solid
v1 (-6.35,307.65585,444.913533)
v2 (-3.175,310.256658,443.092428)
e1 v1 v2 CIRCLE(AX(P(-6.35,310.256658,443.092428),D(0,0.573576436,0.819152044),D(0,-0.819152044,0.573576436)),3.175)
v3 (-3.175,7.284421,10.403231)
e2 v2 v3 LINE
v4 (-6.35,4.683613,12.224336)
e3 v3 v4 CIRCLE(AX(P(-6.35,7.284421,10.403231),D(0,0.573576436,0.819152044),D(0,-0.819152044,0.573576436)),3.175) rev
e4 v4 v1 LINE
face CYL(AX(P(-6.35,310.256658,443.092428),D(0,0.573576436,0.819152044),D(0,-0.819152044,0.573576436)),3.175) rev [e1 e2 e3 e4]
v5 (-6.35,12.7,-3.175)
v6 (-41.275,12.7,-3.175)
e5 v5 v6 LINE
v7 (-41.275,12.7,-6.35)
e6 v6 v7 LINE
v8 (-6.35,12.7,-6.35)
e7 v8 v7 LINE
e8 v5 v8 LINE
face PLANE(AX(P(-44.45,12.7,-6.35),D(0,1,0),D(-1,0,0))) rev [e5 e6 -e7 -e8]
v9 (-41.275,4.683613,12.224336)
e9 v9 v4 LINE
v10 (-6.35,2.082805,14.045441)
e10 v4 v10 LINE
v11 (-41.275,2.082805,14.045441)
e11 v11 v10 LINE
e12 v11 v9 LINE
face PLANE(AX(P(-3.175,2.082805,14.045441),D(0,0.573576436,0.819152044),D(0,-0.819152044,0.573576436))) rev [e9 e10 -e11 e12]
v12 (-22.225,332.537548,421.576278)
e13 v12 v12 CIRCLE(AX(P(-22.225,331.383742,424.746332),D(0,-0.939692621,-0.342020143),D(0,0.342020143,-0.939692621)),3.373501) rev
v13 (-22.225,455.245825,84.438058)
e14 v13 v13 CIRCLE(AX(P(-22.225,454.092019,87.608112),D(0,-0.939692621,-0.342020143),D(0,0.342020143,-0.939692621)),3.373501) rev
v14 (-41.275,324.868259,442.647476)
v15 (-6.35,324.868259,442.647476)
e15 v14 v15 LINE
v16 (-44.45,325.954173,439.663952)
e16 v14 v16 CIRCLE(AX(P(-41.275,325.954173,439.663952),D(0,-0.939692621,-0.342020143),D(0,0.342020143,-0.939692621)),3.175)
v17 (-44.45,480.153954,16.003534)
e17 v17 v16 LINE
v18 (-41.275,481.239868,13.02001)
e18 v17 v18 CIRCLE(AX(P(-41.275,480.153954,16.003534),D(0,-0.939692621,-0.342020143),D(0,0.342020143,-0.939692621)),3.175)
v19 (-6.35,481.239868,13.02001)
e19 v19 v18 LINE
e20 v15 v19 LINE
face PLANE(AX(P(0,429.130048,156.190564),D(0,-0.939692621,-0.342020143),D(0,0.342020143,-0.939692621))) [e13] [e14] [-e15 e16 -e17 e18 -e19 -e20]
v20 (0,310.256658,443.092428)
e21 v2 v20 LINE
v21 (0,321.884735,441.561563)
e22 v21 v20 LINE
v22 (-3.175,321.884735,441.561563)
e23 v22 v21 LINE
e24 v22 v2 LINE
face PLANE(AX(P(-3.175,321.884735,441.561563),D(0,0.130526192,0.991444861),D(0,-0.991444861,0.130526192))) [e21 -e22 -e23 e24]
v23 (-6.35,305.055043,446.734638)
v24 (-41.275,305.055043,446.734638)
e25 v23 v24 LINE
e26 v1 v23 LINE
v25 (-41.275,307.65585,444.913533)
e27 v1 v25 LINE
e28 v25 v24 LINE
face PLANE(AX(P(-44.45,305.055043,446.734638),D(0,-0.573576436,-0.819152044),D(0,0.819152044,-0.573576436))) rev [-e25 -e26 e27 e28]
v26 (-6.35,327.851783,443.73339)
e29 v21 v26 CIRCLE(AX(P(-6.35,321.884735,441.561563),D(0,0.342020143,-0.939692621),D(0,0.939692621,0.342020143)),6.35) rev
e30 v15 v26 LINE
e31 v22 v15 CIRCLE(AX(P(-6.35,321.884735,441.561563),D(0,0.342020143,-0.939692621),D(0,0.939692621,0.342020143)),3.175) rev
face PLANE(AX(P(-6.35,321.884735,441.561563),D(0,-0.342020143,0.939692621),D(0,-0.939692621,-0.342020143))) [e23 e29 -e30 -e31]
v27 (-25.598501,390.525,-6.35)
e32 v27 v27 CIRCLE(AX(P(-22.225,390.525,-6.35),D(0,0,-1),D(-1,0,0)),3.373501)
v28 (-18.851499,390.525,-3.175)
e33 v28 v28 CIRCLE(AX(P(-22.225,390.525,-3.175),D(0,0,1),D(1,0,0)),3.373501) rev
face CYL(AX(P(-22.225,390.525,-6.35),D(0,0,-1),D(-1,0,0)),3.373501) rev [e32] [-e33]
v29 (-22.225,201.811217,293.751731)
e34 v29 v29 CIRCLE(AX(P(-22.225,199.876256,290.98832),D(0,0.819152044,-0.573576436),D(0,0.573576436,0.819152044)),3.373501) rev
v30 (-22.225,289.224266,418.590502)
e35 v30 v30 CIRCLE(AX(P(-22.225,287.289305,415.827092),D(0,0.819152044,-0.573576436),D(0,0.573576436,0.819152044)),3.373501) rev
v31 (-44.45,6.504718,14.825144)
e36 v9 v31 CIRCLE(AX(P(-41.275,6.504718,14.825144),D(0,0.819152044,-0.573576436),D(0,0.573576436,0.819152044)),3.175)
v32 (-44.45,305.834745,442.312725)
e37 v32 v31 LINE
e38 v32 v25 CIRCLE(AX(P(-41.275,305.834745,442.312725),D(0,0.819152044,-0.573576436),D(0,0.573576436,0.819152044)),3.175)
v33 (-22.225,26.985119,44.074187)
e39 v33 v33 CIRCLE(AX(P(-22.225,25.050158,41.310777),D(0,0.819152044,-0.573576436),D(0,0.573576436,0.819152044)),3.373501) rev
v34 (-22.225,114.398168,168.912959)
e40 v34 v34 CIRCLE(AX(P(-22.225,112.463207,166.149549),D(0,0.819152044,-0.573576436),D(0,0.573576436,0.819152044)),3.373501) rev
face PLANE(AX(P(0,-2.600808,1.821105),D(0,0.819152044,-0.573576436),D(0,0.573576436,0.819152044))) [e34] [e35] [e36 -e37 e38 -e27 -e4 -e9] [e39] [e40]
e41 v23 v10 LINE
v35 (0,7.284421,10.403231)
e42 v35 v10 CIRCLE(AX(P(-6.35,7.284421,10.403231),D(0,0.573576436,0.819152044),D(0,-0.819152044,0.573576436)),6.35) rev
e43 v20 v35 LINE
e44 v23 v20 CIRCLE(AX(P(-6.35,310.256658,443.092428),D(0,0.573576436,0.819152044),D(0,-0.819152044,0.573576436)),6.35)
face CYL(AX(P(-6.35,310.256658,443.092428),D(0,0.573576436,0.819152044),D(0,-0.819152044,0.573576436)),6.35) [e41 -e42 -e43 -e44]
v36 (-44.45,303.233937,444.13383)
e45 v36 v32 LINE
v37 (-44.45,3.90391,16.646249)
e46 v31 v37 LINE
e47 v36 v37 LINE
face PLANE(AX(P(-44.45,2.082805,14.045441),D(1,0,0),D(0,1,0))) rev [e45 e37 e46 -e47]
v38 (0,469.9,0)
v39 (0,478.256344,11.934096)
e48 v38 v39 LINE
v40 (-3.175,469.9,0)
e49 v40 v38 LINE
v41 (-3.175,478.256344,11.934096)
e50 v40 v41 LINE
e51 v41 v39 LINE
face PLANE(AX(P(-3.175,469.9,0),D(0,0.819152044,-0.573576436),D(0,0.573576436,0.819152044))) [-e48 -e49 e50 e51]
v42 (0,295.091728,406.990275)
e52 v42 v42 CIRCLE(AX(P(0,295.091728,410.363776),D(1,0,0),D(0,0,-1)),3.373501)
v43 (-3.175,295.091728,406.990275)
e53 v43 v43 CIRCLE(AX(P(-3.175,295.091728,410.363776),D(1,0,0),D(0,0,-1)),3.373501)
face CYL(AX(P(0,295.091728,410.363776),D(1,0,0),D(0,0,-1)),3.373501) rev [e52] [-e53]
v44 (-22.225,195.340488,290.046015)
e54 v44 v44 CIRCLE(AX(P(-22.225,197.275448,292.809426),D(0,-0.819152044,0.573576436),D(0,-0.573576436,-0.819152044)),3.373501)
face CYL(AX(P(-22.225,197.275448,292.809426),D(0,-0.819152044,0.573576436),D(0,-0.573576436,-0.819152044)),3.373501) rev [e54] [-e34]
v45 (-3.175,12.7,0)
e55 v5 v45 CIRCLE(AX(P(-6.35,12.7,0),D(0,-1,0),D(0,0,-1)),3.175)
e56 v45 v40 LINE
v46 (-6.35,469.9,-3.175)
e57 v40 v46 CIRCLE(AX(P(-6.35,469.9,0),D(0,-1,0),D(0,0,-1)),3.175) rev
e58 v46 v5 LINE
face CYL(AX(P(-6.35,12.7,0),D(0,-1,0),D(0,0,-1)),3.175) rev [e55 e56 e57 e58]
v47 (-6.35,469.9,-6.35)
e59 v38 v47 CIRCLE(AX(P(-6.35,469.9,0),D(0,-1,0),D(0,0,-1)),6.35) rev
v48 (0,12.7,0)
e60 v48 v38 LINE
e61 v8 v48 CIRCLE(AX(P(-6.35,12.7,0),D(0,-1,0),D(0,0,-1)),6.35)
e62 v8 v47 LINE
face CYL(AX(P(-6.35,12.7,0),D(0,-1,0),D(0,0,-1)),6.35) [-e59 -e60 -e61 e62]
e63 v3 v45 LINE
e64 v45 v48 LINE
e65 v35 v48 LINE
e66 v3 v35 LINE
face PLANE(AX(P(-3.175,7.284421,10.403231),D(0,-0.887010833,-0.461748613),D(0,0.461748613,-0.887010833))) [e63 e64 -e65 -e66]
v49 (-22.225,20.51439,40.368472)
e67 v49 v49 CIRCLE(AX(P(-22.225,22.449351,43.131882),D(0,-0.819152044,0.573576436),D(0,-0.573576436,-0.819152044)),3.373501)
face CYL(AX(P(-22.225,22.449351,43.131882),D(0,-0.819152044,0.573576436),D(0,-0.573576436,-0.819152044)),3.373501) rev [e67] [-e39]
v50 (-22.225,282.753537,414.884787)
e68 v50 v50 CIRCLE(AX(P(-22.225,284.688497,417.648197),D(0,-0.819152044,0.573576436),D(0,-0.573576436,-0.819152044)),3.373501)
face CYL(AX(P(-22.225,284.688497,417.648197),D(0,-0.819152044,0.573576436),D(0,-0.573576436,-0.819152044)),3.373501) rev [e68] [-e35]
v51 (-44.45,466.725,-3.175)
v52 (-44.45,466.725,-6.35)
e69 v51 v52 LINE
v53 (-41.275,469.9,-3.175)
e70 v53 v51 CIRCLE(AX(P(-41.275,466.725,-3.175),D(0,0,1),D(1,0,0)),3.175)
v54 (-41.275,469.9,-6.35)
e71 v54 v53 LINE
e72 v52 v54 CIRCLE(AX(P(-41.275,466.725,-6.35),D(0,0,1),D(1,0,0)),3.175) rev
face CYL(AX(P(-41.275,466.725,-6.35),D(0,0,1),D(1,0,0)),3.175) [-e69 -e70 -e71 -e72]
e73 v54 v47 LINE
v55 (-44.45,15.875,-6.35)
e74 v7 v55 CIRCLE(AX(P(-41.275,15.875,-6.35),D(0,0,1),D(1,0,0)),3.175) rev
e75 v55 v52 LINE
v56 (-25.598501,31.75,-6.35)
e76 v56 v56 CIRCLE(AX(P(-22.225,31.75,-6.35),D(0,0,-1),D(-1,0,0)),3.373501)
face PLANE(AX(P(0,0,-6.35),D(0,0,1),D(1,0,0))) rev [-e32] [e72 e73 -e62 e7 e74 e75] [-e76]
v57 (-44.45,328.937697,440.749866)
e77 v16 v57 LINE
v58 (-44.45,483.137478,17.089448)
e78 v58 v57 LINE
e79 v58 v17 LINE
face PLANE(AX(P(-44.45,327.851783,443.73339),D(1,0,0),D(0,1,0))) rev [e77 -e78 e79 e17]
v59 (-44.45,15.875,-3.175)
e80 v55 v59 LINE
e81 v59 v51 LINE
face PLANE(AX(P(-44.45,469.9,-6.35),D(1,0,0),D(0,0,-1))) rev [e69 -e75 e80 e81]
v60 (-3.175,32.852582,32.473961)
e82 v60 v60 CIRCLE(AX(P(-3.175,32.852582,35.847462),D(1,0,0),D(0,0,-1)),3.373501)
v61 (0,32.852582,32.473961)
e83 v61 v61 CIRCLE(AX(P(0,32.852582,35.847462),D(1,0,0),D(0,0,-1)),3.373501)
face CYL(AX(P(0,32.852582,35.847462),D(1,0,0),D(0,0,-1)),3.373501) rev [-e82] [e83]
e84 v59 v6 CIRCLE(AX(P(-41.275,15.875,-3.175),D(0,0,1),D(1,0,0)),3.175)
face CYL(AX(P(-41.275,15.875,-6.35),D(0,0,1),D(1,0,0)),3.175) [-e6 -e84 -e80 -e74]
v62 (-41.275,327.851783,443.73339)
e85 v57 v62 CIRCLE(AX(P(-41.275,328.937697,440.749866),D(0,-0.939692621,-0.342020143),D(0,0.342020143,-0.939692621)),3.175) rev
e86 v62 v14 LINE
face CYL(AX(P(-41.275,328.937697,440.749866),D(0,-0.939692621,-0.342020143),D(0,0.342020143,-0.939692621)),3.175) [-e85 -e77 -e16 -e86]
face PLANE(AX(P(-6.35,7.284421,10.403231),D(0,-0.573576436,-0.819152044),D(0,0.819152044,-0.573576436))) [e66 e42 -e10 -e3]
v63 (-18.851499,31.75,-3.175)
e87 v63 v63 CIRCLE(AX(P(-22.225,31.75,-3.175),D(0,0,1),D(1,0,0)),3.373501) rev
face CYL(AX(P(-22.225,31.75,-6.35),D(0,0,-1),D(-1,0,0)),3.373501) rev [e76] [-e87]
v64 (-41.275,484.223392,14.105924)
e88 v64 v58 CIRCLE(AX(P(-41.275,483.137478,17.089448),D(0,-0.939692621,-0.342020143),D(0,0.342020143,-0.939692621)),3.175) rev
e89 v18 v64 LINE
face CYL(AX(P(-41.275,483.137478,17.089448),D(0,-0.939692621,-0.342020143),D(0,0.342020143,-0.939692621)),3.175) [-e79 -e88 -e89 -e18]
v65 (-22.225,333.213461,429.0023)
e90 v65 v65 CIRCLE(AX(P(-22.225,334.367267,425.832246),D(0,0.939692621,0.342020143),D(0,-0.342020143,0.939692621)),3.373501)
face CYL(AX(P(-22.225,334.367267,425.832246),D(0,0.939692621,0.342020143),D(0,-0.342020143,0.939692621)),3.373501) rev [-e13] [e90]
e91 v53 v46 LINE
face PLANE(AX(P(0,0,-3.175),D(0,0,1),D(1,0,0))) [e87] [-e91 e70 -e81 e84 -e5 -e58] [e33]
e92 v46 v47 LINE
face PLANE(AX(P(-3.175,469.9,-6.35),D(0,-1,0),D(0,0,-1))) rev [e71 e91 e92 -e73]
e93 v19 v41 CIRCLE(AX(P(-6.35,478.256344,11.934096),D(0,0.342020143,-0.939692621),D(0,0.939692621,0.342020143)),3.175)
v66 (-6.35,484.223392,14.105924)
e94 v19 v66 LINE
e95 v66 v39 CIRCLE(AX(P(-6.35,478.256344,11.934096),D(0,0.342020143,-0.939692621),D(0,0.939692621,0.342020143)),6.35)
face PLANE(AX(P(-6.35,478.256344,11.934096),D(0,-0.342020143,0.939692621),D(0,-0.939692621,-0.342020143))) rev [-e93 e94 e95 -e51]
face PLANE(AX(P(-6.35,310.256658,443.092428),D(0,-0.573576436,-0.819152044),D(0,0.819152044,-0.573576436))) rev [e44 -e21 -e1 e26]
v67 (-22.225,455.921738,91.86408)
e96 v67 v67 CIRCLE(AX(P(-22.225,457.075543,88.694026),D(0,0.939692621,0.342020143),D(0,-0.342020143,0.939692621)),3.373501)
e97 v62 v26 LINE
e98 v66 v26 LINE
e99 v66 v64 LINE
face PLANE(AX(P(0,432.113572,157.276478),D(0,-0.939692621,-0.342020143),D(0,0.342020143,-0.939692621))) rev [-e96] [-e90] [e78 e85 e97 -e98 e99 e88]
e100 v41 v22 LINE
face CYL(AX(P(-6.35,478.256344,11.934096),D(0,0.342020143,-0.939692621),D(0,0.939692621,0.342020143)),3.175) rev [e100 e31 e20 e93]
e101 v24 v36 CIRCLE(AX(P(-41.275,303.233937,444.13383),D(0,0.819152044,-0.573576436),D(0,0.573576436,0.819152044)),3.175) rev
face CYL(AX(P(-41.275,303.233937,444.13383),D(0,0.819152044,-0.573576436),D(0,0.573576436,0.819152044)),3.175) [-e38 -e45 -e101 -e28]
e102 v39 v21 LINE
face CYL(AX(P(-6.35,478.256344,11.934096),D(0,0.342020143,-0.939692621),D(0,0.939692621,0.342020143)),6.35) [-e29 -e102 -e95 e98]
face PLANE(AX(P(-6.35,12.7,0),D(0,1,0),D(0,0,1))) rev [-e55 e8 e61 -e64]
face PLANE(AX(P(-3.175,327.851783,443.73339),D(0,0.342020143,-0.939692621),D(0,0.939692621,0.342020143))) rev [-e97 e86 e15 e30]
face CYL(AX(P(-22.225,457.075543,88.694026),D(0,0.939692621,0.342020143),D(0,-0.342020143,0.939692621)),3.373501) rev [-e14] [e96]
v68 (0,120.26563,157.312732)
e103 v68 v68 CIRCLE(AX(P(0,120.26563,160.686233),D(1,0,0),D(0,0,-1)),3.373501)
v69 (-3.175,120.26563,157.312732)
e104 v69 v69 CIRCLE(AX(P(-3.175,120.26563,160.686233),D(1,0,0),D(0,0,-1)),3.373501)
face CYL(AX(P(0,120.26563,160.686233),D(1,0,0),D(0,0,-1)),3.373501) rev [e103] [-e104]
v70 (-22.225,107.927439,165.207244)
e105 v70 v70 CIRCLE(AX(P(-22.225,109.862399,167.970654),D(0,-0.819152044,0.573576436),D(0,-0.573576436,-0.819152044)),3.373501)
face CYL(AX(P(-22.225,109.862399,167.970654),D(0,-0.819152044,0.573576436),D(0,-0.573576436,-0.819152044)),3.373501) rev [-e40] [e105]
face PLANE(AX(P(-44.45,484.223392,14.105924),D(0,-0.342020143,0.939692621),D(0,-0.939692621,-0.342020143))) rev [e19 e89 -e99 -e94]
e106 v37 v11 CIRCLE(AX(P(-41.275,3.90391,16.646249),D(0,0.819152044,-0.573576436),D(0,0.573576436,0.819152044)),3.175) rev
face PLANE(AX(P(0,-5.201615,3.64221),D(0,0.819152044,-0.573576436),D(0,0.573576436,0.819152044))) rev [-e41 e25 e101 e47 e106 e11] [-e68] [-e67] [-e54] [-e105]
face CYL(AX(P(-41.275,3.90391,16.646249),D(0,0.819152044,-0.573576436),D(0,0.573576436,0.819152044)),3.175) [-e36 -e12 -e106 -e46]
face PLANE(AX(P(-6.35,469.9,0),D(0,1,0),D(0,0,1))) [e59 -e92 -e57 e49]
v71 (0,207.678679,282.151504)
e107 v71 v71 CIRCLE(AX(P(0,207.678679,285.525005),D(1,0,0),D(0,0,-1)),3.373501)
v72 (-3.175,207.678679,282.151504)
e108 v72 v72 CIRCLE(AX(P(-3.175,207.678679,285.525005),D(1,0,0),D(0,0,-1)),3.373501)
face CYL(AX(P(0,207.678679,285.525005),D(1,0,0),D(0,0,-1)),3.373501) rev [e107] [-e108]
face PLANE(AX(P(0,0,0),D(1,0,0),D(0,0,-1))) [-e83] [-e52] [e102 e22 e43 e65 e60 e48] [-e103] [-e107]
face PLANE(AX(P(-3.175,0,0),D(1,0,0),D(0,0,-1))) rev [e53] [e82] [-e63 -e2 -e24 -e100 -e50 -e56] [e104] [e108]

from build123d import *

# Parameters (mm, degrees)
BASE_FLANGE1_DEPTH                   = 3.175
EDGE_FLANGE1_DEPTH                   = 528.215976366
EDGE_FLANGE1_BEND_DEPTH              = 457.2
EDGE_FLANGE1_BEND_2_DEPTH            = 457.2
F_17_64_0_26563_DIAMETER_HOLE1_D     = 6.747002
F_17_64_0_26563_DIAMETER_HOLE1_DEPTH = 3.175
F_17_64_0_26563_DIAMETER_HOLE1_TIP   = 2.027003899
F_17_64_0_26563_DIAMETER_HOLE2_D     = 6.747002
F_17_64_0_26563_DIAMETER_HOLE2_DEPTH = 3.175
F_17_64_0_26563_DIAMETER_HOLE2_TIP   = 2.027003899
FILLET1_R                            = 3.175
F_17_64_0_26563_DIAMETER_HOLE3_D     = 6.747002
F_17_64_0_26563_DIAMETER_HOLE3_DEPTH = 3.175
F_17_64_0_26563_DIAMETER_HOLE3_TIP   = 2.027003899
F_17_64_0_26563_DIAMETER_HOLE4_D     = 6.747002


# Sheet-metal steps are written as plain solids
with BuildPart() as part:
    # Sketch1 → Base-Flange1 (new body)
    with BuildSketch(Plane(origin=(0, 0, 0), x_dir=(0, 0, -1), z_dir=(1, 0, 0))):
        Polygon((0, 12.7), (0, 469.9), (-11.934096284, 478.25634418), (-441.561562507, 321.884734651), (-443.092427829, 310.256658089), (-10.403230962, 7.284420742), align=None)
    extrude(amount=-BASE_FLANGE1_DEPTH)

    # Edge-Flange1 section (across the edge) → Edge-Flange1 (add)
    with BuildSketch(Plane(origin=(-3.175, 4.683613001, 12.224336148), x_dir=(-3.4914813388431334e-15, 0.819152044288993, -0.5735764363510446), z_dir=(0, 0.5735764363510446, 0.819152044288993))):
        with BuildLine():
            Line((-3.175, 3.175), (-3.175, 41.275))
            Line((-3.175, 41.275), (0, 41.275))
            Line((0, 41.275), (0, 3.175))
            ThreePointArc((0, 3.175), (0.92993597, 0.92993597), (3.175, 0))
            Line((3.175, 0), (3.175, -3.175))
            ThreePointArc((3.175, -3.175), (-1.315128061, -1.315128061), (-3.175, 3.175))
        make_face()
    extrude(amount=EDGE_FLANGE1_DEPTH)

    # Edge-Flange1 section 2 (across the edge) → Edge-Flange1 bend (add)
    with BuildSketch(Plane(origin=(-3.175, 469.9, -3.175), x_dir=(0, 0, 1), z_dir=(0, -1, 0))):
        with BuildLine():
            Line((-3.175, 3.175), (-3.175, 41.275))
            Line((-3.175, 41.275), (0, 41.275))
            Line((0, 41.275), (0, 3.175))
            ThreePointArc((0, 3.175), (0.92993597, 0.92993597), (3.175, 0))
            Line((3.175, 0), (3.175, -3.175))
            ThreePointArc((3.175, -3.175), (-1.315128061, -1.315128061), (-3.175, 3.175))
        make_face()
    extrude(amount=EDGE_FLANGE1_BEND_DEPTH)

    # Edge-Flange1 section 3 (across the edge) → Edge-Flange1 bend 2 (add)
    with BuildSketch(Plane(origin=(-3.175, 324.868258722, 442.647476462), x_dir=(-3.4914813388431334e-15, -0.9396926207859071, -0.3420201433256725), z_dir=(0, 0.3420201433256725, -0.9396926207859071))):
        with BuildLine():
            Line((-3.175, 3.175), (-3.175, 41.275))
            Line((-3.175, 41.275), (0, 41.275))
            Line((0, 41.275), (0, 3.175))
            ThreePointArc((0, 3.175), (0.92993597, 0.92993597), (3.175, 0))
            Line((3.175, 0), (3.175, -3.175))
            ThreePointArc((3.175, -3.175), (-1.315128061, -1.315128061), (-3.175, 3.175))
        make_face()
    extrude(amount=EDGE_FLANGE1_BEND_2_DEPTH)

    # 17/64 (0.26563) Diameter Hole1
    with Locations(Plane(origin=(0, 0, -6.35), x_dir=(-1, 0, 0), z_dir=(0, 0, -1))):
        with Locations((22.225, 390.525), (22.225, 31.75)):
            Hole(F_17_64_0_26563_DIAMETER_HOLE1_D / 2, depth=F_17_64_0_26563_DIAMETER_HOLE1_DEPTH)
            with Locations((0, 0, -(F_17_64_0_26563_DIAMETER_HOLE1_DEPTH + F_17_64_0_26563_DIAMETER_HOLE1_TIP / 2))):  # 118° drill point
                Cone(0, F_17_64_0_26563_DIAMETER_HOLE1_D / 2, F_17_64_0_26563_DIAMETER_HOLE1_TIP, mode=Mode.SUBTRACT)

    # 17/64 (0.26563) Diameter Hole2
    with Locations(Plane(origin=(0, 432.113572267, 157.276478127), x_dir=(1, 0, 0), z_dir=(3.4475760670445246e-15, 0.939692620785907, 0.3420201433256725))):
        with Locations((-22.225, 72.983921169), (-22.225, -285.791078831)):
            Hole(F_17_64_0_26563_DIAMETER_HOLE2_D / 2, depth=F_17_64_0_26563_DIAMETER_HOLE2_DEPTH)
            with Locations((0, 0, -(F_17_64_0_26563_DIAMETER_HOLE2_DEPTH + F_17_64_0_26563_DIAMETER_HOLE2_TIP / 2))):  # 118° drill point
                Cone(0, F_17_64_0_26563_DIAMETER_HOLE2_D / 2, F_17_64_0_26563_DIAMETER_HOLE2_TIP, mode=Mode.SUBTRACT)

    # Fillet1
    fillet1_edges = [part.edges().sort_by_distance(p)[0] for p in [
        (-44.45, 3.383209131, 13.134888741),
        (-44.45, 306.355446478, 445.824085607),
        (-44.45, 469.9, -4.7625),
        (-44.45, 12.7, -4.7625),
        (-44.45, 326.360020758, 443.19043344),
        (-44.45, 482.731630286, 13.562967217),
    ]]
    fillet(fillet1_edges, radius=FILLET1_R)

    # 17/64 (0.26563) Diameter Hole3
    with Locations(Plane(origin=(0, -5.201615481, 3.642210371), x_dir=(-1, 0, 0), z_dir=(2.9747797534781195e-15, -0.819152044288993, 0.5735764363510445))):
        with Locations((22.225, -48.207988183), (22.225, -200.607988183), (22.225, -353.007988183), (22.225, -505.407988183)):
            Hole(F_17_64_0_26563_DIAMETER_HOLE3_D / 2, depth=F_17_64_0_26563_DIAMETER_HOLE3_DEPTH)
            with Locations((0, 0, -(F_17_64_0_26563_DIAMETER_HOLE3_DEPTH + F_17_64_0_26563_DIAMETER_HOLE3_TIP / 2))):  # 118° drill point
                Cone(0, F_17_64_0_26563_DIAMETER_HOLE3_D / 2, F_17_64_0_26563_DIAMETER_HOLE3_TIP, mode=Mode.SUBTRACT)

    # 17/64 (0.26563) Diameter Hole4 (through all)
    with Locations(Plane(origin=(0, 0, 0), x_dir=(0, 0, -1), z_dir=(1, 0, 0))):
        with Locations((-410.363776349, 295.091728247), (-285.5250048, 207.678679347), (-160.68623325, 120.265630447), (-35.8474617, 32.852581547)):
            Hole(F_17_64_0_26563_DIAMETER_HOLE4_D / 2)


solid = part.part
